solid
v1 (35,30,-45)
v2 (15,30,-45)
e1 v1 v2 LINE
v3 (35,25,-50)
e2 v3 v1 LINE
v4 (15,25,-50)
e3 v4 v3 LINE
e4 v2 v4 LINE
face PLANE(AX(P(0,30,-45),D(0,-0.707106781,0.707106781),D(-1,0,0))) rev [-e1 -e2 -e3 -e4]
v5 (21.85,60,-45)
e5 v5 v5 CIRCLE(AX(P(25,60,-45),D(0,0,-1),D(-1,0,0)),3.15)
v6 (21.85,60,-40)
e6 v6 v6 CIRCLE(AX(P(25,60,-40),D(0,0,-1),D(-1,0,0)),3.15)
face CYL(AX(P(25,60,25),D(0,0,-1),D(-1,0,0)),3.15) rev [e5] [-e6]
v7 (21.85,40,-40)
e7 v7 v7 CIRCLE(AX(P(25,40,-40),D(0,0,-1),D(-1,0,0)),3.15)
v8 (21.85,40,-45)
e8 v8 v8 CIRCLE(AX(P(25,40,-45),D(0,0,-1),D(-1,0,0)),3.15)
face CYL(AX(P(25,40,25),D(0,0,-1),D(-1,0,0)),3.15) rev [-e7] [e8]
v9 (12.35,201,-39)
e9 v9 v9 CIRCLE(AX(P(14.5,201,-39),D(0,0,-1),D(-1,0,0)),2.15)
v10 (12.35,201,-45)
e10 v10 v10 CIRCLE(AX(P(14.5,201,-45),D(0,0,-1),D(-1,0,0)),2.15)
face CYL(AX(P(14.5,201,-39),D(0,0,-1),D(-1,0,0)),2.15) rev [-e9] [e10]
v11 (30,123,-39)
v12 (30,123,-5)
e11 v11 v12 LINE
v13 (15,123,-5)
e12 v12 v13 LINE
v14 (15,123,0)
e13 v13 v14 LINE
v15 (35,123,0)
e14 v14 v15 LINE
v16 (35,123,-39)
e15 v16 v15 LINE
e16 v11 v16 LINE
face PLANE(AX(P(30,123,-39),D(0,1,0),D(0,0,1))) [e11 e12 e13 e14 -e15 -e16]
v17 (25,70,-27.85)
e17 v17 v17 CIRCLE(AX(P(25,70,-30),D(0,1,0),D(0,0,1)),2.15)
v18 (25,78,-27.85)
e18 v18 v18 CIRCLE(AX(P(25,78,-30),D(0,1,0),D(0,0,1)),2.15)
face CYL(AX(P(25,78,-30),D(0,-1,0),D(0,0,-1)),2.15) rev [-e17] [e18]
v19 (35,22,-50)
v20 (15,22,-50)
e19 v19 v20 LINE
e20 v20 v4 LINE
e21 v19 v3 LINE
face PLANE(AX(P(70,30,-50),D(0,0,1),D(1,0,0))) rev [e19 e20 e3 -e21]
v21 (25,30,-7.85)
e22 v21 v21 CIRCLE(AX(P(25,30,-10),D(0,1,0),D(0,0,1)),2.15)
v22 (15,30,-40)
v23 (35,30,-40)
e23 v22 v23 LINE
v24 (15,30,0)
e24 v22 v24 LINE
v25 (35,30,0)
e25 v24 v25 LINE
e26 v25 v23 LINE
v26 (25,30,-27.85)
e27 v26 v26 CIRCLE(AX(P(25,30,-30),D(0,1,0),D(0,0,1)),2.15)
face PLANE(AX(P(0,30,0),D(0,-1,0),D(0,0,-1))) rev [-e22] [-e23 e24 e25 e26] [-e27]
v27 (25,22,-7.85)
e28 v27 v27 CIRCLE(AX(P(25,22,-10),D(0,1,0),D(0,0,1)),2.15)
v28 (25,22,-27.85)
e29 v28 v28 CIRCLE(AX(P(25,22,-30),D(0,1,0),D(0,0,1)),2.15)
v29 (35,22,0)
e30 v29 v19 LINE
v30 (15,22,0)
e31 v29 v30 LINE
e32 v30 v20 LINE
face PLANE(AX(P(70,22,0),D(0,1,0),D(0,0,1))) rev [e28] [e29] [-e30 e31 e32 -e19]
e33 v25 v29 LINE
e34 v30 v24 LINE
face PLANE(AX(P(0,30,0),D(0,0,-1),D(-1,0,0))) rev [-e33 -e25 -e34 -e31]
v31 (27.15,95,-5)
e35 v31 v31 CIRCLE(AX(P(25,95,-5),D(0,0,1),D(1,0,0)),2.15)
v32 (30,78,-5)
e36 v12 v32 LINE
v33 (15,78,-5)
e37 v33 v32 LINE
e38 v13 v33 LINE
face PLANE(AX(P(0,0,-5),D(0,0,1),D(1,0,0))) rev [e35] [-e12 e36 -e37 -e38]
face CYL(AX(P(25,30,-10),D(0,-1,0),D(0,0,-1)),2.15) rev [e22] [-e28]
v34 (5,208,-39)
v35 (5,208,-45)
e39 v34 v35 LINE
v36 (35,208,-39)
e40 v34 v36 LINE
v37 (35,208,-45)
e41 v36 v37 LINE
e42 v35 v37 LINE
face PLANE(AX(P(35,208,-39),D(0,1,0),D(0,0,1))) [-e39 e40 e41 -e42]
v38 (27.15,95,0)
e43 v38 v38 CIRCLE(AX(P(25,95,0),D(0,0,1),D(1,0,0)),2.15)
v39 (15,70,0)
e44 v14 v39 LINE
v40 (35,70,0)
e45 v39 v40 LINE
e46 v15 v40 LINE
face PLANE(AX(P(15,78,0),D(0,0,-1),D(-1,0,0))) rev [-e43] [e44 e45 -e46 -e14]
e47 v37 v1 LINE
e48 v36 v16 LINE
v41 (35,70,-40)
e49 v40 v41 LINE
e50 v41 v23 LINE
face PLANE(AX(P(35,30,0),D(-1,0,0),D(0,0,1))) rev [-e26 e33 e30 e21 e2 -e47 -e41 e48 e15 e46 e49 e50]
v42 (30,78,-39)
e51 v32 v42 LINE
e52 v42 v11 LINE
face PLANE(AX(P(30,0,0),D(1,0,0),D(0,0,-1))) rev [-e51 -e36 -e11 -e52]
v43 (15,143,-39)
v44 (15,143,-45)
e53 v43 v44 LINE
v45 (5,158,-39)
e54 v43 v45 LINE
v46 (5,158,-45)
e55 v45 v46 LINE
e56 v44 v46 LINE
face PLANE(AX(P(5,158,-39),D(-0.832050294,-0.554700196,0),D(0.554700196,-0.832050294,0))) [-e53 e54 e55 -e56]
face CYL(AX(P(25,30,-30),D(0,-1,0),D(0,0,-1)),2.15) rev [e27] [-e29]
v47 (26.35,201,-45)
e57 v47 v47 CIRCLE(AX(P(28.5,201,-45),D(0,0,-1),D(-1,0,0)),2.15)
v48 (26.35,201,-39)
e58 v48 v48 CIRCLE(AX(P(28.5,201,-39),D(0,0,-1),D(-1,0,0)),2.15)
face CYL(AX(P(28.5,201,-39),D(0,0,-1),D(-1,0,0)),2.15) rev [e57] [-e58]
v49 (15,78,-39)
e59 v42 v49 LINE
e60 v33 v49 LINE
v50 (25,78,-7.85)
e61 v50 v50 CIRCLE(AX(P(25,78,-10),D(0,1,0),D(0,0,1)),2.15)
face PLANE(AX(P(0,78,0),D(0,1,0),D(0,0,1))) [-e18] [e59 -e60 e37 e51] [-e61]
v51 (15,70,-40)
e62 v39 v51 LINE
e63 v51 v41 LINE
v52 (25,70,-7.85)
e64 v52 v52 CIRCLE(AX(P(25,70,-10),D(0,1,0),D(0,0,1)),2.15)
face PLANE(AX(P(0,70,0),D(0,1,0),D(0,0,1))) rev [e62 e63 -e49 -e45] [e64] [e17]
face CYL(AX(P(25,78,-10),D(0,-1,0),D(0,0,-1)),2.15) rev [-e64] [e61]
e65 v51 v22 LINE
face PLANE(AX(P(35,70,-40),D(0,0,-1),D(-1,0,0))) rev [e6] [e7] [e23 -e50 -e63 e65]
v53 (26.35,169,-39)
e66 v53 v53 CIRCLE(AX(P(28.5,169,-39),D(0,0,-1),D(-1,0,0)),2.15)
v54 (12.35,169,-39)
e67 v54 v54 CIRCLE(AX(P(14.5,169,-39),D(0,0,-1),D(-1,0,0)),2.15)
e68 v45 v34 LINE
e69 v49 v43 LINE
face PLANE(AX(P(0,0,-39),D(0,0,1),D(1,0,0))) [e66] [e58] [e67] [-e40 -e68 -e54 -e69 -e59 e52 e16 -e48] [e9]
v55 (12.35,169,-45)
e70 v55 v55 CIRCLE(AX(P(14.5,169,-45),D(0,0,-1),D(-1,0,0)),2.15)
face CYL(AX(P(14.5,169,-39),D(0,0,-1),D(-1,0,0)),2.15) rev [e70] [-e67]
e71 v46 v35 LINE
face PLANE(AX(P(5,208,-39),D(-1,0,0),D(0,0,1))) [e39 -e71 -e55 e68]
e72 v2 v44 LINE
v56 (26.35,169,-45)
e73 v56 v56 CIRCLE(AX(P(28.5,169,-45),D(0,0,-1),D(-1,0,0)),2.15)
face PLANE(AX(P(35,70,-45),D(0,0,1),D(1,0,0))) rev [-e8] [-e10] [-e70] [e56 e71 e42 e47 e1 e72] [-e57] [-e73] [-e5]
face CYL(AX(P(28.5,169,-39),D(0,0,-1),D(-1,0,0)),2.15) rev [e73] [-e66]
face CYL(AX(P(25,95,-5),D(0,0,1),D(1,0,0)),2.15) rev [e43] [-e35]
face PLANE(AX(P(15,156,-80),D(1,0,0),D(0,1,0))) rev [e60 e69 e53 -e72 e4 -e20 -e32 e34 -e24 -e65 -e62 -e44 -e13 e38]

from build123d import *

# Parameters (mm, degrees)
SKETCH_1_W               = 35
SKETCH_1_H               = 80
SKETCH_1_R               = 2.15
EXTRUDE_1_DEPTH          = 30
SKETCH_3_W               = 35
SKETCH_3_H               = 5
EXTRUDE_2_DEPTH          = 40
SKETCH_4_W               = 40
SKETCH_4_H               = 22
SKETCH_4_W_2             = 30
SKETCH_4_H_2             = 20
CUT_EXTRUDE_2_DEPTH      = 70
CHAMFER_1_SIZE           = 5
SKETCH_7_R               = 3.15
CUT_EXTRUDE_3_DEPTH      = 70
CUT_EXTRUDE_4_DEPTH      = 70
SKETCH_9_R               = 2.15
EXTRUDE_3_DEPTH          = 8
EXTRUDE_4_DEPTH          = 35
CUT_EXTRUDE_5_DEPTH      = 154.300358773
CUT_EXTRUDE_5_DEPTH_BACK = 154.300358773
SKETCH_2_R               = 4.1
CUT_EXTRUDE_6_DEPTH      = 179.776396652
CUT_EXTRUDE_6_DEPTH_BACK = 179.776396652
SKETCH_11_W              = 15
SKETCH_11_H              = 156
SKETCH_13_W              = 40
SKETCH_13_H              = 22
CUT_EXTRUDE_7_DEPTH      = 177.453960001
SKETCH_19_W              = 45.998360267
SKETCH_19_H              = 78
CUT_EXTRUDE_11_DEPTH     = 56
SKETCH_21_R              = 2.15
EXTRUDE_8_DEPTH          = 6
SKETCH_22_W              = 39
SKETCH_22_H              = 45
EXTRUDE_9_DEPTH          = 5
SKETCH_23_W              = 20
SKETCH_23_H              = 53
SKETCH_23_R              = 2.15
EXTRUDE_10_DEPTH         = 5


with BuildPart() as part:
    # 草图1 → 凸台-拉伸1 (new body)
    with BuildSketch(Plane(origin=(0, 0, 0), x_dir=(1, 0, 0), z_dir=(0, 1, 0))):
        with Locations((17.5, 40)):
            Rectangle(SKETCH_1_W, SKETCH_1_H)
        with Locations(Location((25, 30, 0), (0, 0, 270))):
            Circle(SKETCH_1_R, mode=Mode.SUBTRACT)
        with Locations(Location((25, 10, 0), (0, 0, 270))):
            Circle(SKETCH_1_R, mode=Mode.SUBTRACT)
    extrude(amount=EXTRUDE_1_DEPTH)

    # 草图3 → 凸台-拉伸2 (add)
    with BuildSketch(Plane(origin=(0, 30, 0), x_dir=(1, 0, 0), z_dir=(0, 1, 0))):
        with Locations((17.5, 42.5)):
            Rectangle(SKETCH_3_W, SKETCH_3_H)
    extrude(amount=EXTRUDE_2_DEPTH)

    # 草图4 → 切除-拉伸2 (cut)
    with BuildSketch(Plane.ZY):
        with Locations((-20, 11)):
            Rectangle(SKETCH_4_W, SKETCH_4_H)
        with Locations((-65, 20)):
            Rectangle(SKETCH_4_W_2, SKETCH_4_H_2)
    extrude(amount=-CUT_EXTRUDE_2_DEPTH, mode=Mode.SUBTRACT)

    # 倒角1
    chamfer_1_edges = [part.edges().sort_by_distance(p)[0] for p in [
        (17.5, 30, -50),
    ]]
    chamfer(chamfer_1_edges, length=CHAMFER_1_SIZE - 0.0001)  # a hair under: the kernel refuses the full size

    # 草图7 → 切除-拉伸3 (cut)
    with BuildSketch(Plane(origin=(0, 0, -45), x_dir=(-1, 0, 0), z_dir=(0, 0, -1))):
        with Locations((-25, 60)):
            Circle(SKETCH_7_R)
        with Locations((-25, 40)):
            Circle(SKETCH_7_R)
    extrude(amount=-CUT_EXTRUDE_3_DEPTH, mode=Mode.SUBTRACT)

    # 草图8 → 切除-拉伸4 (cut)
    with BuildSketch(Plane(origin=(0, 30, 0), x_dir=(1, 0, 0), z_dir=(0, 1, 0))):
        Polygon((0, 0), (15, 0), (0, 36), align=None)
    extrude(amount=-CUT_EXTRUDE_4_DEPTH, mode=Mode.SUBTRACT)

    # 草图9 → 凸台-拉伸3 (add)
    with BuildSketch(Plane(origin=(0, 70, 0), x_dir=(1, 0, 0), z_dir=(0, 1, 0))):
        Polygon((35, 45), (0, 45), (0, 36), (15, 0), (35, 0), align=None)
        with Locations(Location((25, 30, 0), (0, 0, 270))):
            Circle(SKETCH_9_R, mode=Mode.SUBTRACT)
        with Locations(Location((25, 10, 0), (0, 0, 270))):
            Circle(SKETCH_9_R, mode=Mode.SUBTRACT)
    extrude(amount=EXTRUDE_3_DEPTH)

    # 草图10 → 凸台-拉伸4 (add, through all)
    with BuildSketch(Plane.ZY):
        Polygon((-40, 156), (-80, 156), (-80, 146), (-50, 146), (-50, 131), (-45, 126), (-45, 78), (-40.5, 78), align=None)
    extrude(amount=-EXTRUDE_4_DEPTH)

    # 草图2 → 切除-拉伸5 (cut, two sides: drawn at the far end of the back side and taken through both)
    with BuildSketch(Plane(origin=(0, 30, 0), x_dir=(1, 0, 0), z_dir=(0, 1, 0)).offset(-CUT_EXTRUDE_5_DEPTH_BACK)):
        with Locations(Location((10, 70, 0), (0, 0, 270))):
            Circle(SKETCH_2_R)
    extrude(amount=CUT_EXTRUDE_5_DEPTH + CUT_EXTRUDE_5_DEPTH_BACK, mode=Mode.SUBTRACT)

    # 草图11 → 切除-拉伸6 (cut, two sides: drawn at the far end of the back side and taken through both)
    with BuildSketch(Plane.XY.offset(-CUT_EXTRUDE_6_DEPTH_BACK)):
        with Locations((7.5, 78)):
            Rectangle(SKETCH_11_W, SKETCH_11_H)
    extrude(amount=CUT_EXTRUDE_6_DEPTH + CUT_EXTRUDE_6_DEPTH_BACK, mode=Mode.SUBTRACT)

    # 草图13 → 切除-拉伸7 (cut, through all)
    with BuildSketch(Plane(origin=(35, 0, 0), x_dir=(0, 0, -1), z_dir=(1, 0, 0))):
        with Locations((60, 11)):
            Rectangle(SKETCH_13_W, SKETCH_13_H)
    extrude(amount=-CUT_EXTRUDE_7_DEPTH, mode=Mode.SUBTRACT)

    # 草图19 → 切除-拉伸11 (cut)
    with BuildSketch(Plane.ZY.offset(-15)):
        with Locations((-57.000819867, 117)):
            Rectangle(SKETCH_19_W, SKETCH_19_H)
    extrude(amount=-CUT_EXTRUDE_11_DEPTH, mode=Mode.SUBTRACT)

    # 草图21 → 凸台-拉伸8 (add)
    with BuildSketch(Plane(origin=(0, 0, -45), x_dir=(-1, 0, 0), z_dir=(0, 0, -1))):
        Polygon((-35, 78), (-35, 208), (-5, 208), (-5, 158), (-15, 143), (-15, 78), align=None)
        with Locations((-28.5, 201)):
            Circle(SKETCH_21_R, mode=Mode.SUBTRACT)
        with Locations((-14.5, 201)):
            Circle(SKETCH_21_R, mode=Mode.SUBTRACT)
        with Locations((-28.5, 169)):
            Circle(SKETCH_21_R, mode=Mode.SUBTRACT)
        with Locations((-14.5, 169)):
            Circle(SKETCH_21_R, mode=Mode.SUBTRACT)
    extrude(amount=-EXTRUDE_8_DEPTH)

    # 草图22 → 凸台-拉伸9 (add)
    with BuildSketch(Plane(origin=(35, 0, 0), x_dir=(0, 0, -1), z_dir=(1, 0, 0))):
        with Locations((19.5, 100.5)):
            Rectangle(SKETCH_22_W, SKETCH_22_H)
    extrude(amount=-EXTRUDE_9_DEPTH)

    # 草图23 → 凸台-拉伸10 (add)
    with BuildSketch(Plane.XY):
        with Locations((25, 96.5)):
            Rectangle(SKETCH_23_W, SKETCH_23_H)
        with Locations((25, 95)):
            Circle(SKETCH_23_R, mode=Mode.SUBTRACT)
    extrude(amount=-EXTRUDE_10_DEPTH)


solid = part.part
